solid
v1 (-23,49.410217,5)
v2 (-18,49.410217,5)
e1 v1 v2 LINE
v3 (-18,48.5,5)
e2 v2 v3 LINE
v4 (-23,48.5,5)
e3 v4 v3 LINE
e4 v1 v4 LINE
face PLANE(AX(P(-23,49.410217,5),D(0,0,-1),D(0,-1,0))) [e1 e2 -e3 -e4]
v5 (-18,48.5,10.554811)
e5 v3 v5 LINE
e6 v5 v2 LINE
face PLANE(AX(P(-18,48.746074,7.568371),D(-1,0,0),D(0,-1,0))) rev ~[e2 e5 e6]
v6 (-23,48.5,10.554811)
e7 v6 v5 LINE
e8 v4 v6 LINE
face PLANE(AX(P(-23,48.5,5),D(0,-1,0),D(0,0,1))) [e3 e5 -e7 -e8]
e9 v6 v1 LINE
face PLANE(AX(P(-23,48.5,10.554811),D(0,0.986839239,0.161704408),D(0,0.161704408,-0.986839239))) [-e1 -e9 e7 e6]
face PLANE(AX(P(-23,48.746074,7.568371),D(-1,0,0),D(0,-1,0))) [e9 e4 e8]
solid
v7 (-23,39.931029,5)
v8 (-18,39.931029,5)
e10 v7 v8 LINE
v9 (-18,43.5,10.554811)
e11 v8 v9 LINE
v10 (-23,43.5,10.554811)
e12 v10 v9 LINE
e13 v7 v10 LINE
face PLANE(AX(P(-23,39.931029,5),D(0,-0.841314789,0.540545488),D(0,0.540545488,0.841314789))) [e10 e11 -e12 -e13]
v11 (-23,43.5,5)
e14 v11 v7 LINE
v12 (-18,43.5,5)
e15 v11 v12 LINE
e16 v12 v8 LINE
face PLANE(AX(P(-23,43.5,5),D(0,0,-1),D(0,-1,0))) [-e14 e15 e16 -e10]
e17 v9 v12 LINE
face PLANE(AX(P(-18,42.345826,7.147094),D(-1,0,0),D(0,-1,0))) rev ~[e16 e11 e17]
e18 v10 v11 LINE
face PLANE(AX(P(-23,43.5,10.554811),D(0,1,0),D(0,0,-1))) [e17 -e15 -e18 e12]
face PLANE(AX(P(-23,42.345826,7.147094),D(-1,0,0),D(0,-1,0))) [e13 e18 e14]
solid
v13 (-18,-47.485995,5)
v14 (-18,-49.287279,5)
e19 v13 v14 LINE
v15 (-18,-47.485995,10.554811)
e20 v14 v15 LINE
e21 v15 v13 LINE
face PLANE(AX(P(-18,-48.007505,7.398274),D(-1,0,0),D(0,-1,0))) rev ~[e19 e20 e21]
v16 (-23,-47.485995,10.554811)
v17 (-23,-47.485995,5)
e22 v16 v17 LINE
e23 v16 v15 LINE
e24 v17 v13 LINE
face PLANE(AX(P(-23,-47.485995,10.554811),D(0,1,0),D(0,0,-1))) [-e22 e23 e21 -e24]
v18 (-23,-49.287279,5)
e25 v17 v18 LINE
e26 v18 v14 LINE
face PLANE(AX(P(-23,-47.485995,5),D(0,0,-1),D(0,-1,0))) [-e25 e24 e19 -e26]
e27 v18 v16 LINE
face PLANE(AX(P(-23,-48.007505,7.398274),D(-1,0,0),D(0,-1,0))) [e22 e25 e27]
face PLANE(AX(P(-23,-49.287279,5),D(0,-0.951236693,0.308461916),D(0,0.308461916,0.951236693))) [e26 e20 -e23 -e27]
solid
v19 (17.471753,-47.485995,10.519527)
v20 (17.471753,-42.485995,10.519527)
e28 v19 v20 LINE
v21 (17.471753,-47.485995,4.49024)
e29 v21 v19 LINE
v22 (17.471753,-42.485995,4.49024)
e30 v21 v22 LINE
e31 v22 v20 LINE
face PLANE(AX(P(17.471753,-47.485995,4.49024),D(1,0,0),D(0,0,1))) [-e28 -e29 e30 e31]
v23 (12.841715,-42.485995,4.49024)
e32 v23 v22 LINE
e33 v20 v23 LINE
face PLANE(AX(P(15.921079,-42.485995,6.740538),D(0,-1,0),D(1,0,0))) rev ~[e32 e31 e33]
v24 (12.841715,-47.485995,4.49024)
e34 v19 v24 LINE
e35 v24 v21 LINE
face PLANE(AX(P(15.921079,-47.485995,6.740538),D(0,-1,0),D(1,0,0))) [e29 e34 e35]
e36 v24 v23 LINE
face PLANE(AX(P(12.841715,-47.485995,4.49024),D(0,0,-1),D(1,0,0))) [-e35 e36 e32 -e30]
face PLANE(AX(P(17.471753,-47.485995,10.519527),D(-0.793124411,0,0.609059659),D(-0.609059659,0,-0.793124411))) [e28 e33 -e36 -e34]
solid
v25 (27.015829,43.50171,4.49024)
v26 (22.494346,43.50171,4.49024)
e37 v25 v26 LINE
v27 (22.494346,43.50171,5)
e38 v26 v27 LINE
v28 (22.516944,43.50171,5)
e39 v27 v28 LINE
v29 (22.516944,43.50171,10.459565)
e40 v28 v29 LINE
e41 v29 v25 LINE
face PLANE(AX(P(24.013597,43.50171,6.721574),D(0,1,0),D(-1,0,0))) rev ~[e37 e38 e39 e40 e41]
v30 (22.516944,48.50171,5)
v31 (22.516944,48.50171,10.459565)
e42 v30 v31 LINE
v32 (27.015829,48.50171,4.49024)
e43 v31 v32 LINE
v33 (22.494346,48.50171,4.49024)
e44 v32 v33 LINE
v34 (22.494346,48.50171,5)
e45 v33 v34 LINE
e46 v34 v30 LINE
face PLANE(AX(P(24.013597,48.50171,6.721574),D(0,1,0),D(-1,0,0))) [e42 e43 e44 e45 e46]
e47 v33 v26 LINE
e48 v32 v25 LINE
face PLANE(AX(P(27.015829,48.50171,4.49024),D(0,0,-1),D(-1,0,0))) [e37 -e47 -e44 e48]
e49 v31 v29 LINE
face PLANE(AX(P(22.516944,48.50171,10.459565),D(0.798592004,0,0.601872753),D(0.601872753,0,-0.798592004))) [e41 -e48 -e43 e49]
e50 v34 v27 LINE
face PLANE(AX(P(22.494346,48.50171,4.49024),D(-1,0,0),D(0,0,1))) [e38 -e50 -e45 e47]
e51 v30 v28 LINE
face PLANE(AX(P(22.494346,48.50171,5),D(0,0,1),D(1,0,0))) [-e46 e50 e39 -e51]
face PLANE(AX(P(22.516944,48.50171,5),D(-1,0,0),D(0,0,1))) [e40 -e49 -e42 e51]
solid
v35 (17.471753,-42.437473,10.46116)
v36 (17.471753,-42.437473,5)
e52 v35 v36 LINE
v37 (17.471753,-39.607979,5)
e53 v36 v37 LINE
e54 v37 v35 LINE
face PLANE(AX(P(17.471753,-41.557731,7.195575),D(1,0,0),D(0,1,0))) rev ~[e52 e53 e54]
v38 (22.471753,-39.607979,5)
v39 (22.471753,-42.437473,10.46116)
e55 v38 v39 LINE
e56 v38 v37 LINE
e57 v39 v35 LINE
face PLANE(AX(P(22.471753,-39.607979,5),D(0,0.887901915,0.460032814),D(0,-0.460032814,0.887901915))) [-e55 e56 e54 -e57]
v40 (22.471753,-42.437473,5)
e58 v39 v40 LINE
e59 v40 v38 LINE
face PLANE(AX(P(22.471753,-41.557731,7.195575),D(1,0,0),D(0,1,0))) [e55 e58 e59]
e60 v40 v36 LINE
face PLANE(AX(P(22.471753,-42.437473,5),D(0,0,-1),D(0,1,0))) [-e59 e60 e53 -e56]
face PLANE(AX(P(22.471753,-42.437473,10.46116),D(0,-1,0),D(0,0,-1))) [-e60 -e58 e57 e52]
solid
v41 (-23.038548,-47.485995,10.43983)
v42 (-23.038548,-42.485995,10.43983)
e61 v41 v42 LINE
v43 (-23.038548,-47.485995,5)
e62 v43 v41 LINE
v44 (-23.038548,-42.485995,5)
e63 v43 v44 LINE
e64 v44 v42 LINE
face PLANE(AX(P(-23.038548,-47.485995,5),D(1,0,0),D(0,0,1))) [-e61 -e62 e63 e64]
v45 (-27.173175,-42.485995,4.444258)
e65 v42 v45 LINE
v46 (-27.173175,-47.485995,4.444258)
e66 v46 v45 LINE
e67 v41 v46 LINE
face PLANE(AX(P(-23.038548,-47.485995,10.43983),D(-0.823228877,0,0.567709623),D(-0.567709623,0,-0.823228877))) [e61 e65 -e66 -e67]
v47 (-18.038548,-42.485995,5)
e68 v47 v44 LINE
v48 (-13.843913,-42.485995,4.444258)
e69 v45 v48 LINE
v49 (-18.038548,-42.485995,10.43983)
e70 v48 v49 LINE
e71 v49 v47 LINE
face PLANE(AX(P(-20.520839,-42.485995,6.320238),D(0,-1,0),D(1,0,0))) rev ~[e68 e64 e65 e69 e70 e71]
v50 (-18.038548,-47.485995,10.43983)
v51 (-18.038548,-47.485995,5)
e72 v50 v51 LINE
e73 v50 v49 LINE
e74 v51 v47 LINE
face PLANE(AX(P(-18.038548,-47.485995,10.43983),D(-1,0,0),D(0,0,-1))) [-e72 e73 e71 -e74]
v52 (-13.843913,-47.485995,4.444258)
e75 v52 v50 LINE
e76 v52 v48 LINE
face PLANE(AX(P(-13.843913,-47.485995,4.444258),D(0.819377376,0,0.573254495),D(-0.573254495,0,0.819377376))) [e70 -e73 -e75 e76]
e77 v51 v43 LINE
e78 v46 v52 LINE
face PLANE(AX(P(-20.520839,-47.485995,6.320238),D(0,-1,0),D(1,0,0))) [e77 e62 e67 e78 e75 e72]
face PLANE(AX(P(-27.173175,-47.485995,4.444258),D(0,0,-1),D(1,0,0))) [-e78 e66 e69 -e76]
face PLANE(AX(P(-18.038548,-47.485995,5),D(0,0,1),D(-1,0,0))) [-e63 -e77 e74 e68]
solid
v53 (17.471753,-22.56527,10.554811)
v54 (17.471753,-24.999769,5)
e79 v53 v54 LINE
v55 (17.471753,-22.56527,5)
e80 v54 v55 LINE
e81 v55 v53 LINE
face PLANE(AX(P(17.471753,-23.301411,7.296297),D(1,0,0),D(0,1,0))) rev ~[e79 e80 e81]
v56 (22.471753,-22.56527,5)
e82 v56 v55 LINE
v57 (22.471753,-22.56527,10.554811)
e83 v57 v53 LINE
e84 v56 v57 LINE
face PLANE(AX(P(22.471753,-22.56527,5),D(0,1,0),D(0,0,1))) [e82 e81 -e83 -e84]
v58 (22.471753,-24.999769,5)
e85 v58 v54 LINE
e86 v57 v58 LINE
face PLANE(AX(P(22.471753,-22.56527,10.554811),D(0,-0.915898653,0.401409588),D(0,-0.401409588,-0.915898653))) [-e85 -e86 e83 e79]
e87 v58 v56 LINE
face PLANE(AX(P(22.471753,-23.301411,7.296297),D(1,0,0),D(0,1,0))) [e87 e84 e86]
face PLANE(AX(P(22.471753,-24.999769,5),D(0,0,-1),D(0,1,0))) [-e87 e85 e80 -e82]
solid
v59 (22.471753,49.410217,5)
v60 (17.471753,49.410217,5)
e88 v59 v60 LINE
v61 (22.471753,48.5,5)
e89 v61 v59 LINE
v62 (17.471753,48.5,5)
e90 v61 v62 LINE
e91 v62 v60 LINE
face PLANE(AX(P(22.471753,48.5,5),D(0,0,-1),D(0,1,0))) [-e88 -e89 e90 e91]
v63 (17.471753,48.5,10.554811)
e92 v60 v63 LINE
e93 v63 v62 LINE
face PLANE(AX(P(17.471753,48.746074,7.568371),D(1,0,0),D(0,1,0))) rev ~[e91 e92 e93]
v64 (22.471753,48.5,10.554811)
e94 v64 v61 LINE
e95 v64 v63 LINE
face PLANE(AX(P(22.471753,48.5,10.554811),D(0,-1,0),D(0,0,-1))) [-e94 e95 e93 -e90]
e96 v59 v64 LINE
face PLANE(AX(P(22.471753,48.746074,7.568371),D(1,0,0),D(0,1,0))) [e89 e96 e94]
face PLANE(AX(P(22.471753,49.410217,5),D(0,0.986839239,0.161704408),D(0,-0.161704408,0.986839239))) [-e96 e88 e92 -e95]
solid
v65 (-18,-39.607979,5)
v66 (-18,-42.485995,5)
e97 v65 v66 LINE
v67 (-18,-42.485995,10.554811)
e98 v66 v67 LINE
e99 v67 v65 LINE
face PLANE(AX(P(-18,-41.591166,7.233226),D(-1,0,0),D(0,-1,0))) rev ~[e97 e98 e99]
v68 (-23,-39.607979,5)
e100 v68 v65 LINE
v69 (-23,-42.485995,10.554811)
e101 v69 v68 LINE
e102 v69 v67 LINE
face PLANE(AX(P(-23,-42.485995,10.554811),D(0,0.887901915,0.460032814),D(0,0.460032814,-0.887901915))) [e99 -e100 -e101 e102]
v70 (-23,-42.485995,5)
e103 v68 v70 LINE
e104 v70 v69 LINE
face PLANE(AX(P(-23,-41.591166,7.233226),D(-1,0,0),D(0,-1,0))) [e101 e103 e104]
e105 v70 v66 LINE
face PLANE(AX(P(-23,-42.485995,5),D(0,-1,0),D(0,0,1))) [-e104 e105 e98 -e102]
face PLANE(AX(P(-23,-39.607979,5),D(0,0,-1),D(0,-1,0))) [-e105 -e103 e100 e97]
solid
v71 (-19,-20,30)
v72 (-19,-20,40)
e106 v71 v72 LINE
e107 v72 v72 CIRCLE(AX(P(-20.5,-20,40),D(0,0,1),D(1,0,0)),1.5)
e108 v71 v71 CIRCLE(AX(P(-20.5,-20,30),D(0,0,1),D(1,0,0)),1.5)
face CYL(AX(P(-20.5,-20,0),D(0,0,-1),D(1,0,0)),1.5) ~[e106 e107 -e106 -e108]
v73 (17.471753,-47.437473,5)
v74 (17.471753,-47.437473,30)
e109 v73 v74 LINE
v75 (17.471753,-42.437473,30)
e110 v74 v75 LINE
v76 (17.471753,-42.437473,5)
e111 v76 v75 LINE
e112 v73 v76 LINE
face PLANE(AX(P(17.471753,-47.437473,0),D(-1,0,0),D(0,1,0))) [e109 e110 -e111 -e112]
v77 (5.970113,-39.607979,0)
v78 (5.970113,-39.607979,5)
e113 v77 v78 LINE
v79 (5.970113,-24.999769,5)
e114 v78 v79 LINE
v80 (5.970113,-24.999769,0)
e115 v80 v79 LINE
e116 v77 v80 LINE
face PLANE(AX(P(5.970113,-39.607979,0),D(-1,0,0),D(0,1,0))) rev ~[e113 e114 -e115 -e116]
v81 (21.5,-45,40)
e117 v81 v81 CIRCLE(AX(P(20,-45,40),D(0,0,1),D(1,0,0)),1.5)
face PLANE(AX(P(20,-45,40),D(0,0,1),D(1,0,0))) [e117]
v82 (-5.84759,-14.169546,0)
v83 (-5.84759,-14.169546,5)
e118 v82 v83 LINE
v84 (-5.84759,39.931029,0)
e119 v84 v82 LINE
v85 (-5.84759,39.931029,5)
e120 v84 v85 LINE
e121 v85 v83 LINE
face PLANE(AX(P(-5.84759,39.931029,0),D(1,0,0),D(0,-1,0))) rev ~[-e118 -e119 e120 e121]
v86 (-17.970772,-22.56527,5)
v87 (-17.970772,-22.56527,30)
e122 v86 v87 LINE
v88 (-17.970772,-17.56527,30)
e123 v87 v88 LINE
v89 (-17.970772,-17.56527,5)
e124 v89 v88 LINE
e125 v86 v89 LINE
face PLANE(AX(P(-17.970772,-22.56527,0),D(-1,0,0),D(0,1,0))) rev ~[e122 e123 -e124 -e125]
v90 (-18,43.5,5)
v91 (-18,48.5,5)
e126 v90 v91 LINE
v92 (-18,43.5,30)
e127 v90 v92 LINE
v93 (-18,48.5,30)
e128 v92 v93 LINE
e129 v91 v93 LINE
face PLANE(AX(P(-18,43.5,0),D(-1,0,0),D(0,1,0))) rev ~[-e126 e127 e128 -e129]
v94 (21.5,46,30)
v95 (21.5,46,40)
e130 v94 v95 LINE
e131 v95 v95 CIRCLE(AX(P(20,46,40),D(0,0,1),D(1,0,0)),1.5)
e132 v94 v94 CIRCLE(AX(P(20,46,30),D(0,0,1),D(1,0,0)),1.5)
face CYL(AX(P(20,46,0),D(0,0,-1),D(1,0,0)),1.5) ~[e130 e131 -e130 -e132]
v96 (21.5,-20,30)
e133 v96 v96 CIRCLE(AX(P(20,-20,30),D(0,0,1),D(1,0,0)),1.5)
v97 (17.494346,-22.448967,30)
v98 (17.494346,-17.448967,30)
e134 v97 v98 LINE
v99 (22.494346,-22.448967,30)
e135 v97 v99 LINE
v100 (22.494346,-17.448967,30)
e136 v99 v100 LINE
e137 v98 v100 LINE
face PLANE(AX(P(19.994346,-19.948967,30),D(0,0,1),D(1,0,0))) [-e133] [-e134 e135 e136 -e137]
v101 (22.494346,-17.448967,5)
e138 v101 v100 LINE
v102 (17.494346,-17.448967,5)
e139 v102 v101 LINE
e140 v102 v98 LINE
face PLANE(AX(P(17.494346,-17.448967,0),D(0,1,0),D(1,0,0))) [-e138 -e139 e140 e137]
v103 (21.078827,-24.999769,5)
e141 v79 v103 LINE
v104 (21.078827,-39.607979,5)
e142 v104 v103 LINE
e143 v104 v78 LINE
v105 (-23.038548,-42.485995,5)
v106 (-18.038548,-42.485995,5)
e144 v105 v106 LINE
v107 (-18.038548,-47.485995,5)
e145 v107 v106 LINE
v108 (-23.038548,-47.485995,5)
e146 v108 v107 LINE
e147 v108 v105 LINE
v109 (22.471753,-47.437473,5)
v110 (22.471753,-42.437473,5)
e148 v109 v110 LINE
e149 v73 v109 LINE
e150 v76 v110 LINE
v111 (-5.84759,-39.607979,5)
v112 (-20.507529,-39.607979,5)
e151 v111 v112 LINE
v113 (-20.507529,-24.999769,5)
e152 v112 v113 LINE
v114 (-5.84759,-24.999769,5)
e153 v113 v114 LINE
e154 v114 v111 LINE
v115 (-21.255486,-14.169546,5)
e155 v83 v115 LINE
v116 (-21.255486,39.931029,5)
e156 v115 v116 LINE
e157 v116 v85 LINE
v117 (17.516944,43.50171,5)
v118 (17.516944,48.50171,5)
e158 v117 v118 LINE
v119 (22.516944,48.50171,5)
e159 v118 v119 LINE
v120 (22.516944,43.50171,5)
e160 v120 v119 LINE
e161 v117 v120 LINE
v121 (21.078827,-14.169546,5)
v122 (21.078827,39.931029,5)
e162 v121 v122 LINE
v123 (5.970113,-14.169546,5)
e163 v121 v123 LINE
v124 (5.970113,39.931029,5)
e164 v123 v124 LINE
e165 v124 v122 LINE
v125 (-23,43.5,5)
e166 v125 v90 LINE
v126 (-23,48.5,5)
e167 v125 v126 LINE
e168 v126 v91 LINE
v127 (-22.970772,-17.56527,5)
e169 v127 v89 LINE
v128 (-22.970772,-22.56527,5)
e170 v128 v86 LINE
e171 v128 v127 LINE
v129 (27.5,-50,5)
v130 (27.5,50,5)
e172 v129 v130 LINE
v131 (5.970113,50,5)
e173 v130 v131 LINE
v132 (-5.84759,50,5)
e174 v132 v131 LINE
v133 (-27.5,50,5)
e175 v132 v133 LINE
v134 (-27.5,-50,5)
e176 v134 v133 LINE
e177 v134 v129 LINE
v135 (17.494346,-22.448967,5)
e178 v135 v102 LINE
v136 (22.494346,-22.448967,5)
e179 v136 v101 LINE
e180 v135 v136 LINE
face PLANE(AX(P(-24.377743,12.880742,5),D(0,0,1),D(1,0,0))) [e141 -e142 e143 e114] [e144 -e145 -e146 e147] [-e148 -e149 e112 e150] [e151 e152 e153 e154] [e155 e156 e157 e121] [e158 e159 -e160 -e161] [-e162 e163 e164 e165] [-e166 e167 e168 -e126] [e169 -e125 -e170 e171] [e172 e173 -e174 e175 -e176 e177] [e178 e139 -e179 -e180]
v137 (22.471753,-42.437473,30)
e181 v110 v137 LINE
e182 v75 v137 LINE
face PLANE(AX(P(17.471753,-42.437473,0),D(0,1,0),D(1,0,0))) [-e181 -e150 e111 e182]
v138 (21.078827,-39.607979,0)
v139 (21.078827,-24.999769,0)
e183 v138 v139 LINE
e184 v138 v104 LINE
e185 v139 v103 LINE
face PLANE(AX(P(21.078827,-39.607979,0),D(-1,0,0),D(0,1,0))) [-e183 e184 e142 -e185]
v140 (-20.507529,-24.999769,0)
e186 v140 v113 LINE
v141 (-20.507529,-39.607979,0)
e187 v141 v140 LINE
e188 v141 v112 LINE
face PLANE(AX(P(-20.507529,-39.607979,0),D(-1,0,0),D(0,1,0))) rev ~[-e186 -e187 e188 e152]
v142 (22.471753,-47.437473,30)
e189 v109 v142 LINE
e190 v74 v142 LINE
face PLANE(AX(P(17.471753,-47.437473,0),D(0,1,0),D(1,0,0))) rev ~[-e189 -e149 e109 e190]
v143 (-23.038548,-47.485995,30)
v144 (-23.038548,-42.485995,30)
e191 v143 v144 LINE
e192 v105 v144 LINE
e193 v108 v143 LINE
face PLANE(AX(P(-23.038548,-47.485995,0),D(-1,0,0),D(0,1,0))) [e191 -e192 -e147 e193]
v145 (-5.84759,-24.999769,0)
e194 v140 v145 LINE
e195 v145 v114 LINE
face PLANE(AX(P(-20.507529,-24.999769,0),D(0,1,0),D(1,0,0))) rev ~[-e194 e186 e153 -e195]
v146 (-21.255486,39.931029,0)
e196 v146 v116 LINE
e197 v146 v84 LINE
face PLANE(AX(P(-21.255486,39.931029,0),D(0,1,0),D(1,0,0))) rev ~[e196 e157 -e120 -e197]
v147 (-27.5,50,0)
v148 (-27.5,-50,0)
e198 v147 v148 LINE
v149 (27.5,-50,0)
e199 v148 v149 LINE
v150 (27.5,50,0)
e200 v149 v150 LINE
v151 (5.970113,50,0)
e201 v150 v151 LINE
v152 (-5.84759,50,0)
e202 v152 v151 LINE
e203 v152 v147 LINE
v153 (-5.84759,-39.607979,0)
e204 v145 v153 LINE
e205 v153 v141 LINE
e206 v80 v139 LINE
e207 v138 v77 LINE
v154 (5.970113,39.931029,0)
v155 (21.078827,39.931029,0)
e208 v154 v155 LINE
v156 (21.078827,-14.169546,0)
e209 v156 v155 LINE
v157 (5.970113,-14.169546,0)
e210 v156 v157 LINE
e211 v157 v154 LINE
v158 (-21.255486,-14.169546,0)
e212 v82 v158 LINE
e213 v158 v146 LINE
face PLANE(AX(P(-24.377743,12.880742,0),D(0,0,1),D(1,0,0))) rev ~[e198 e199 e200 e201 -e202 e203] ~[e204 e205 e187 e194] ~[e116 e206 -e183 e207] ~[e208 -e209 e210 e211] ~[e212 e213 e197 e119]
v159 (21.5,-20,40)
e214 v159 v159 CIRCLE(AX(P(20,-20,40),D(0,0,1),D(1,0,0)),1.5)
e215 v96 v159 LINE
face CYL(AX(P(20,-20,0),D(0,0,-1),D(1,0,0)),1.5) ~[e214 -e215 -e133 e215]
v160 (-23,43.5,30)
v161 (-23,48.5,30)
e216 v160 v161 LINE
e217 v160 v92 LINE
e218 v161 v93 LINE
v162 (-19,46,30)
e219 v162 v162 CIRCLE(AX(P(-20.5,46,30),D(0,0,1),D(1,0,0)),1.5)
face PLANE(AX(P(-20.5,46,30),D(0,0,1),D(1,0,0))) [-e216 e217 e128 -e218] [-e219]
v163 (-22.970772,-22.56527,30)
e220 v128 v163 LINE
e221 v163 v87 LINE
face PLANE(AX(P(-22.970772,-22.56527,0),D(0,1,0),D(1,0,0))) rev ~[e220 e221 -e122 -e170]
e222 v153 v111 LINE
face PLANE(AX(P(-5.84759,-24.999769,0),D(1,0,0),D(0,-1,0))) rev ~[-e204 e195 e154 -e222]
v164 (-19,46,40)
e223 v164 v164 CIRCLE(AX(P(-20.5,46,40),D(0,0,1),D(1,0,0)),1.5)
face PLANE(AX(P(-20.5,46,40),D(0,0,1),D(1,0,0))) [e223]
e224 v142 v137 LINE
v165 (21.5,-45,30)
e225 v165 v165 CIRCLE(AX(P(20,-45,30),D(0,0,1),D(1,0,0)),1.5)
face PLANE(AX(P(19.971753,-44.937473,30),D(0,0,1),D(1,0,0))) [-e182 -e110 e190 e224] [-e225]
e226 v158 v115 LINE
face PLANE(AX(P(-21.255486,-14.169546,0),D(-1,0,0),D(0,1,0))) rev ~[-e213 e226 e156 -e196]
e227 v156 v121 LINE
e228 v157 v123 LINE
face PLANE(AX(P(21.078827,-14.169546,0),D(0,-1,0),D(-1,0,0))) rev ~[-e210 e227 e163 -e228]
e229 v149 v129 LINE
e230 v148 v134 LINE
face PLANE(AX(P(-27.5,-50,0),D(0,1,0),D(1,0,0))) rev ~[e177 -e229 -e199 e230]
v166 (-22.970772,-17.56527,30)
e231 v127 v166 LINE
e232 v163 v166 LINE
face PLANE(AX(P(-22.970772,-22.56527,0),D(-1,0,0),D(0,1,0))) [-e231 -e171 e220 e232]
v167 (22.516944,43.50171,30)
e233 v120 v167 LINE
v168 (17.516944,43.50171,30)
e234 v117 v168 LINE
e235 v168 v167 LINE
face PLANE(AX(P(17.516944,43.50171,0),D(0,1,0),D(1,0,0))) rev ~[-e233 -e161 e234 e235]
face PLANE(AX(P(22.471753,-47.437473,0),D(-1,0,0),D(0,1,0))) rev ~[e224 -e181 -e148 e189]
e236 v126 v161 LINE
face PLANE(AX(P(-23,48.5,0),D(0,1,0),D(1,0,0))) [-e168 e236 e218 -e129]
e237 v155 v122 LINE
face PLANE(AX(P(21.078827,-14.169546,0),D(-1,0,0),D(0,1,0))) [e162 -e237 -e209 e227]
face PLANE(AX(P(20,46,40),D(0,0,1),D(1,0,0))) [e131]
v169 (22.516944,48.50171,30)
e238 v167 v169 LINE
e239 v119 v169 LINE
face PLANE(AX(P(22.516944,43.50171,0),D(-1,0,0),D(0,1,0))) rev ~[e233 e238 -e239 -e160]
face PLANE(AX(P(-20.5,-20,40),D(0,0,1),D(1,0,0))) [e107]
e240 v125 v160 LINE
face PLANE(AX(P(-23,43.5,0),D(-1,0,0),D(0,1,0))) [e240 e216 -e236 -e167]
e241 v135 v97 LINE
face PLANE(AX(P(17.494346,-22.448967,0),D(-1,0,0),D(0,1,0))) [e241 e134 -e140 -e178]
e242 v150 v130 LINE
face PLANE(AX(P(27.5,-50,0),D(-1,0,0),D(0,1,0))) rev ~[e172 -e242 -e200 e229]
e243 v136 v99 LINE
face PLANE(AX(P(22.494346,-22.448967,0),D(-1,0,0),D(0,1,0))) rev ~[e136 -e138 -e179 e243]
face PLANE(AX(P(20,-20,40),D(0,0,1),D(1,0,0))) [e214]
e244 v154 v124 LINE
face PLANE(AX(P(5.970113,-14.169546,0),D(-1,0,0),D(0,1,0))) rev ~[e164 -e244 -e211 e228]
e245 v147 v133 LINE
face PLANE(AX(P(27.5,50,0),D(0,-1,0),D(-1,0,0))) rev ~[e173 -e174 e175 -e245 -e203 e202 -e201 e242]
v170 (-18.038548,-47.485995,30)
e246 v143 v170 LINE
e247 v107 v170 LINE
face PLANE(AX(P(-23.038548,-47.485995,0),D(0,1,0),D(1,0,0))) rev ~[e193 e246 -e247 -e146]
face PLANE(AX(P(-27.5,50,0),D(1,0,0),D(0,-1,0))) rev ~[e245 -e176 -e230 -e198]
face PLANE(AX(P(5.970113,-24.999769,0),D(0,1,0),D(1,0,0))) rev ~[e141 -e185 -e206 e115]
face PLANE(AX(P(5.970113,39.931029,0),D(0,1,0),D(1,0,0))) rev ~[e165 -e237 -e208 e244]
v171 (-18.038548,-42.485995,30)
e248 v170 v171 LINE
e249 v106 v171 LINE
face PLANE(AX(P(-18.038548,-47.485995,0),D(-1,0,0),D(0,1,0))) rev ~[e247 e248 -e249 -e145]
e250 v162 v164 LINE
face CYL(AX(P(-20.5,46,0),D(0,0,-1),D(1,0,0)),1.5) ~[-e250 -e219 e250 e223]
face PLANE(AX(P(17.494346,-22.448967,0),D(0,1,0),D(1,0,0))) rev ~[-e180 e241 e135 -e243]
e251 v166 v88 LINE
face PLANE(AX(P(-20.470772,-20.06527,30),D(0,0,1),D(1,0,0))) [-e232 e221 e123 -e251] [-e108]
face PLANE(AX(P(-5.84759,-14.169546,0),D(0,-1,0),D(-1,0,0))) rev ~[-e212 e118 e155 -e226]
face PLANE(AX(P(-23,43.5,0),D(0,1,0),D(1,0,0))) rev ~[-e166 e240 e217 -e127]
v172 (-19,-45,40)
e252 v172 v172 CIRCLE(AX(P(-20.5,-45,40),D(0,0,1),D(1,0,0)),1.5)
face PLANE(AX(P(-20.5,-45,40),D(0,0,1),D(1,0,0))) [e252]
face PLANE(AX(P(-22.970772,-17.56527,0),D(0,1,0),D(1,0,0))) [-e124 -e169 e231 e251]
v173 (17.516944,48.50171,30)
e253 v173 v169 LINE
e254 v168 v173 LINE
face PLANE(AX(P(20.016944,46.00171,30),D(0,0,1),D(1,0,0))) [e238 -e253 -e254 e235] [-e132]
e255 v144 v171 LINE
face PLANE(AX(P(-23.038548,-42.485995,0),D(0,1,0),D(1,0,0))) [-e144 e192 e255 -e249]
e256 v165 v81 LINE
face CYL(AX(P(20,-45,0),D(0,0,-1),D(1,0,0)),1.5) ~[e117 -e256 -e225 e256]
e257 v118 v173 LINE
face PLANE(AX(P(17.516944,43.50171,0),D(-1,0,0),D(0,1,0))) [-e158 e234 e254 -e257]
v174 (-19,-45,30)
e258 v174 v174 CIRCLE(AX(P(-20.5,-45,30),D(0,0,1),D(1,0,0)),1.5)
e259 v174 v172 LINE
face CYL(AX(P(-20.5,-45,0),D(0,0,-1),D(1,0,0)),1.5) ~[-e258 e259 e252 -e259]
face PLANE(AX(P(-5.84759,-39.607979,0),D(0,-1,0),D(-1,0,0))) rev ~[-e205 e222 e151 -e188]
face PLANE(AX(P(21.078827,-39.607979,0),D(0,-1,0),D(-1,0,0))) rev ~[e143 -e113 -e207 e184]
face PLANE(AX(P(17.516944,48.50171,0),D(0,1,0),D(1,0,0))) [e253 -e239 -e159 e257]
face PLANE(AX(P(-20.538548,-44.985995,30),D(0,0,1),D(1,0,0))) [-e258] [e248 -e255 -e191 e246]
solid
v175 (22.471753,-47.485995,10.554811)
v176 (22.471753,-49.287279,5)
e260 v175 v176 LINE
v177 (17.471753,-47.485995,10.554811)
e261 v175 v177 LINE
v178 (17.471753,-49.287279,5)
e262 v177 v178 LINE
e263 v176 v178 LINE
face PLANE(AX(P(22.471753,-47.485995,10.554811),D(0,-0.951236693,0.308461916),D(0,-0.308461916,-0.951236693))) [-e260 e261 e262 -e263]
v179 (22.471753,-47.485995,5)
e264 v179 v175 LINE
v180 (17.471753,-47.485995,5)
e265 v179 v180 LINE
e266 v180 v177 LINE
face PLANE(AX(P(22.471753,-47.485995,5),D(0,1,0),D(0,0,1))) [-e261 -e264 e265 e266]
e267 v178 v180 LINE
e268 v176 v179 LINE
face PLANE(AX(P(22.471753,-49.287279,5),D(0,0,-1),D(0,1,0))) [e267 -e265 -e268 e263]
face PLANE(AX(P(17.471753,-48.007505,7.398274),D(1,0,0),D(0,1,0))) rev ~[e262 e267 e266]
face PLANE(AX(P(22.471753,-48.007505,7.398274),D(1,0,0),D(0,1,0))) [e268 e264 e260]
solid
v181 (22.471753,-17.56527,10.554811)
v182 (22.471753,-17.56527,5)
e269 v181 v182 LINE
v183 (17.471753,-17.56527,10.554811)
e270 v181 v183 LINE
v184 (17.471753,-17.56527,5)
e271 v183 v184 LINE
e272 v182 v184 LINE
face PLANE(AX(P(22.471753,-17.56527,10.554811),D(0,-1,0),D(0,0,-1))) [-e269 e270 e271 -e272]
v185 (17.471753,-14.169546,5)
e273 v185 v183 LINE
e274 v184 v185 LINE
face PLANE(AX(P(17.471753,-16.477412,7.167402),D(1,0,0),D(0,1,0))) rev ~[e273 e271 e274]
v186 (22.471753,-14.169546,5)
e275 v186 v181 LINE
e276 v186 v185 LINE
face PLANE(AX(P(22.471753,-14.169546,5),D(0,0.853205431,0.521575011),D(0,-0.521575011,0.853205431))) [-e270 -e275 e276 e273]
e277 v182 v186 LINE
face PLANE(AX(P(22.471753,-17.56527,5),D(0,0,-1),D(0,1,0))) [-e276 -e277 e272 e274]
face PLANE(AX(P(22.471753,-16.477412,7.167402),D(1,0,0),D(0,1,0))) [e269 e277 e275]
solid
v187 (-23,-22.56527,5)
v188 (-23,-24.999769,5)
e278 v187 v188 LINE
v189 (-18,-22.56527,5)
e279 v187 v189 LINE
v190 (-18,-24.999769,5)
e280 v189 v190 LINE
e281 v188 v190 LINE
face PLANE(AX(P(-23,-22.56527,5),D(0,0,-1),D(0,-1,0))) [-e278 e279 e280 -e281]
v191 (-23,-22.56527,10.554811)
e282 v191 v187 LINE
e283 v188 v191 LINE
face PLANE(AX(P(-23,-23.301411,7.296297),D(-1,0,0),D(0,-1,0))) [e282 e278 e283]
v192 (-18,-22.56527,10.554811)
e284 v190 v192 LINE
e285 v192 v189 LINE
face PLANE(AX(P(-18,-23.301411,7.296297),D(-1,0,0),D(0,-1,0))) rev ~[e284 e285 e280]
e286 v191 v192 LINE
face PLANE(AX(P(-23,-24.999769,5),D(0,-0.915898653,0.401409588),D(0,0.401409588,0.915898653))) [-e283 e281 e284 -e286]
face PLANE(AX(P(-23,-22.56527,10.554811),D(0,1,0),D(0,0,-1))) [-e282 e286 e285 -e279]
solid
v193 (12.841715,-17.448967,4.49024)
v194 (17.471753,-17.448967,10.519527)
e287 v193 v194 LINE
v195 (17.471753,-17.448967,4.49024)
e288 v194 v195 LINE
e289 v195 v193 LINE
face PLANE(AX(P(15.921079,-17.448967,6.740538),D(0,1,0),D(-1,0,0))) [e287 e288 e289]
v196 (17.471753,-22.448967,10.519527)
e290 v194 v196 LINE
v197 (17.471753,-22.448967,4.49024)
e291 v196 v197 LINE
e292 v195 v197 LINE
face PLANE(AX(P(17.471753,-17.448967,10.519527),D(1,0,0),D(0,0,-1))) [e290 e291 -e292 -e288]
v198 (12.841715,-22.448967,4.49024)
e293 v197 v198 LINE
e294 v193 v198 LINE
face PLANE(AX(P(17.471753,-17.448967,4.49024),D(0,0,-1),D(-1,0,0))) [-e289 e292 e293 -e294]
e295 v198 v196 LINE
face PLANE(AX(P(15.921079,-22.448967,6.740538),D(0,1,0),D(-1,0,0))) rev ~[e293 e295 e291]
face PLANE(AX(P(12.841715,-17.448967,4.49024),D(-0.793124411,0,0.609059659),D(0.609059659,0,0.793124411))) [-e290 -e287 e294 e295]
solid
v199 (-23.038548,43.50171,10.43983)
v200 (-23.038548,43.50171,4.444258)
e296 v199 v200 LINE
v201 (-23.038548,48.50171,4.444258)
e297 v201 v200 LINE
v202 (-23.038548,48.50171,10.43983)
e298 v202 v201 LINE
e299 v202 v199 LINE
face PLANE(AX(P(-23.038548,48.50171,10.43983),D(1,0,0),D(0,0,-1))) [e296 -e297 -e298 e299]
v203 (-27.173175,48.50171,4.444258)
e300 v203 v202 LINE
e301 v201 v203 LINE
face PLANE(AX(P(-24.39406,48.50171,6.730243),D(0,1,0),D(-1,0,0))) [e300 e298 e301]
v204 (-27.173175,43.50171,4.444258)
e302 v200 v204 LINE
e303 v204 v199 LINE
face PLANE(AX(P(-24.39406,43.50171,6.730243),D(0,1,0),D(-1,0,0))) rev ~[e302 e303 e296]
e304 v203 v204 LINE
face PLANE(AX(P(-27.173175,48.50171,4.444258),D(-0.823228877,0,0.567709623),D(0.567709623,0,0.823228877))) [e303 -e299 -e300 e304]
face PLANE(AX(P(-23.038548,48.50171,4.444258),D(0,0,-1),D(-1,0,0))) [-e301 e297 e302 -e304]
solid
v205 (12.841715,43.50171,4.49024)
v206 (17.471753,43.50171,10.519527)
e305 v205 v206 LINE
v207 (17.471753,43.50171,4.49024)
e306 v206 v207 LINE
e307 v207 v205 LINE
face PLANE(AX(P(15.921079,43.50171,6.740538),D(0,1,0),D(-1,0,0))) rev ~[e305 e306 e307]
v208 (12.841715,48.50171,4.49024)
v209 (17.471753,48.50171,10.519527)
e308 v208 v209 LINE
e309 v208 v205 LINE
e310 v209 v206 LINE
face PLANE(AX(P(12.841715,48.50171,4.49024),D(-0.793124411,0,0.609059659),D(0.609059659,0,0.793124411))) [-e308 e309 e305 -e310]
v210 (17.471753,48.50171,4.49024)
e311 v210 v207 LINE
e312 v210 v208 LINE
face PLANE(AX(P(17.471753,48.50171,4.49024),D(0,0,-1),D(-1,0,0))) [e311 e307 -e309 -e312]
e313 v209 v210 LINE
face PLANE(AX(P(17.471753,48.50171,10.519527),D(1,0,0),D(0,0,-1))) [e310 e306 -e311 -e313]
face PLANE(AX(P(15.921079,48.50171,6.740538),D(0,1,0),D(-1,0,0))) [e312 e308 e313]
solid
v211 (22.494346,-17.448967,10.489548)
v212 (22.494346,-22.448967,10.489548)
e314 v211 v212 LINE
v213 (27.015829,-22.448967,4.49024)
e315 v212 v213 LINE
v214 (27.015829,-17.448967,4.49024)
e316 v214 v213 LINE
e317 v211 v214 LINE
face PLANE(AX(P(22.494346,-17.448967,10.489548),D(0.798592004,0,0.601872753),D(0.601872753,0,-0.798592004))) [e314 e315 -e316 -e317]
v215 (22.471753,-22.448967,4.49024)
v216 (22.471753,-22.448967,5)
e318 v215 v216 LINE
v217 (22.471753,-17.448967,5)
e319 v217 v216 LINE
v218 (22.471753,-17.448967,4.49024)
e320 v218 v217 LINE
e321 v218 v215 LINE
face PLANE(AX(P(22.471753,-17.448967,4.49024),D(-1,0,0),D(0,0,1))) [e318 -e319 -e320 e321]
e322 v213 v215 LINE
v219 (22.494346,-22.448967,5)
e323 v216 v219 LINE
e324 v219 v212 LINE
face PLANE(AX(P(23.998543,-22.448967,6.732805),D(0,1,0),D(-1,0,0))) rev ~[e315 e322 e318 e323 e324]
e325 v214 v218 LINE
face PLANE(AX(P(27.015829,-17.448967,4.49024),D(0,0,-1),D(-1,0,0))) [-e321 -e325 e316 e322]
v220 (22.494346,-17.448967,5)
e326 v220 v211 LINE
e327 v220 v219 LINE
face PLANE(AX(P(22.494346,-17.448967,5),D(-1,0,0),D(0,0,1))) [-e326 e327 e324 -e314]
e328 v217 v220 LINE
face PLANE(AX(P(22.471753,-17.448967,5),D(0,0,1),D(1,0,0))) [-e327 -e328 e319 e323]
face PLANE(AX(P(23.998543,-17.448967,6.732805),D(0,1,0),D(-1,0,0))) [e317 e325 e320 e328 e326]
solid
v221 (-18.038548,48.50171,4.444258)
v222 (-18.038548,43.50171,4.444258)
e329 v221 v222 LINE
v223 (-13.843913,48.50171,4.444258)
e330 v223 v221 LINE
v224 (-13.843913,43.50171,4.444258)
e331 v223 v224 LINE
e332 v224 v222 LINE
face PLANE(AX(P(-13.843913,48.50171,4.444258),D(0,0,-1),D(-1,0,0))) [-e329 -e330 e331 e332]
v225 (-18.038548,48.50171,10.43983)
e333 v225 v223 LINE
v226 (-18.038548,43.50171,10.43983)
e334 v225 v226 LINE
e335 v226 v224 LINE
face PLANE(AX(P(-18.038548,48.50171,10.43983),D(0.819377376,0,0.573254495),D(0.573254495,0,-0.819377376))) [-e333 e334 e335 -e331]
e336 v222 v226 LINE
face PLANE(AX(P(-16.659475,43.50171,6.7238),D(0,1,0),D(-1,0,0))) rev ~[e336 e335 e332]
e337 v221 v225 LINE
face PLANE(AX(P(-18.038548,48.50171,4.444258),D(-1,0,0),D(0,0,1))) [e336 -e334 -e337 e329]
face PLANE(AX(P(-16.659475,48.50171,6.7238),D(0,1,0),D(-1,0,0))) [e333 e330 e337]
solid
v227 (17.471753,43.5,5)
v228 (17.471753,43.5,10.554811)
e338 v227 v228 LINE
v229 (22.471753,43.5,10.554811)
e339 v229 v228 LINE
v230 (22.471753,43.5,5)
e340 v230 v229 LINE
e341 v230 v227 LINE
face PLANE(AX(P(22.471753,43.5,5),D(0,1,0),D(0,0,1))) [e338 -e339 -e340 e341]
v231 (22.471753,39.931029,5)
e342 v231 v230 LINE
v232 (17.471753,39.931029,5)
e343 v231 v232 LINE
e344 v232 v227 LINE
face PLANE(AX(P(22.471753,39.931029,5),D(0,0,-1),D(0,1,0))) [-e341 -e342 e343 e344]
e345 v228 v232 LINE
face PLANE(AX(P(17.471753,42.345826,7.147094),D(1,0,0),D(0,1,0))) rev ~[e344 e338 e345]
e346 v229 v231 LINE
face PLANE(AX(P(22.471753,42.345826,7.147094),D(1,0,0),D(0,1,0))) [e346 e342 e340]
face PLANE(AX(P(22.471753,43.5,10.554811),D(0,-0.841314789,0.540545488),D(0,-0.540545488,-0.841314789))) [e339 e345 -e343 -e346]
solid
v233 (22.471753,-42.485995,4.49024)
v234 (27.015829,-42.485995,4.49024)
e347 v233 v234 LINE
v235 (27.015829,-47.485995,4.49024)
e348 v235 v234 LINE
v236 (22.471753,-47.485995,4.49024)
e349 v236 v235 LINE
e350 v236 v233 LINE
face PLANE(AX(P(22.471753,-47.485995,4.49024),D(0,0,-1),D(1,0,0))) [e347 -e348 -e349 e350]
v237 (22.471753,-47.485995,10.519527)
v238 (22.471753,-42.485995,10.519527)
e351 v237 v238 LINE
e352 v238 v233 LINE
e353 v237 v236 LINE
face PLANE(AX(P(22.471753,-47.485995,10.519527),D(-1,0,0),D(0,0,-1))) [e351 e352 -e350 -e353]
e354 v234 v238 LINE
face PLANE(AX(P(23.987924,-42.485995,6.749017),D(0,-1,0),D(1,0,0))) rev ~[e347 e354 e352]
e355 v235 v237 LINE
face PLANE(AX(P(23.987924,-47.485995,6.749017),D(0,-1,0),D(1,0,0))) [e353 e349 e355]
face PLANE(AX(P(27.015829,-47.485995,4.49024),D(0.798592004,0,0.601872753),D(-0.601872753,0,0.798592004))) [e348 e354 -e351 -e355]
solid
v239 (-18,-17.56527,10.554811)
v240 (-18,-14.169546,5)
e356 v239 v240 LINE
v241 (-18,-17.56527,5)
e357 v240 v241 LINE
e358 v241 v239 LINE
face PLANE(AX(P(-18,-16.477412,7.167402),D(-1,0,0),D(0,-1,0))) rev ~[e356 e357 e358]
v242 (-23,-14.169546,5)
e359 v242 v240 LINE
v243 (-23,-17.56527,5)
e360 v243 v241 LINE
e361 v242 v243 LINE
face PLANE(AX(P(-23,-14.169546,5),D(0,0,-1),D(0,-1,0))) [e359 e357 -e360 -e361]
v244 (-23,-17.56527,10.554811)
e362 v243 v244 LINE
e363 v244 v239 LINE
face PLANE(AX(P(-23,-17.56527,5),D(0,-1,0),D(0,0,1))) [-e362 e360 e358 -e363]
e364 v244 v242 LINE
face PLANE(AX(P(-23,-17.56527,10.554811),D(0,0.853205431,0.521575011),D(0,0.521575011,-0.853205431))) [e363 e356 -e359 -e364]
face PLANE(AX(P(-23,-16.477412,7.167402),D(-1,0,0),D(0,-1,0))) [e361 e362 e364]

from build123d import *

# Parameters (mm, degrees)
F0_W      = 6.2445142865
F0_H      = 54.1005749255
F0_W_2    = 5
F0_H_2    = 5
F0_W_3    = 11.8177030236
F0_H_3    = 10.0689709187
F0_W_4    = 6.4211731404
F0_H_4    = 10.8302235603
F0_H_5    = 14.6082099527
F0_H_6    = 10.3920206428
F0_W_5    = 6.9924706221
F1_DEPTH  = 5
F0_R      = 1.5
F2_DEPTH  = 30
F3_DEPTH  = 40
F5_DEPTH  = 5
F7_DEPTH  = 5
F9_DEPTH  = 5
F11_DEPTH = 5
F13_DEPTH = 5


# Not quite as in the source:
# - a feature names something its author has since deleted; it is built from what else it names


with BuildPart() as f1:
    # F0 (on Top) → F1 (new body)
    with BuildSketch(Plane.XY):
        with Locations((-24.3777428567, 12.8807416186)):
            Rectangle(F0_W, F0_H)
        Polygon((-21.2554857135, 39.9310290813), (-5.8475900441, 39.9310290813), (-5.8475900441, 50), (-27.5, 50), (-27.5, 39.9310290813), align=None)
        with Locations((-20.5, 46)):
            Rectangle(F0_W_2, F0_H_2, mode=Mode.SUBTRACT)
        with Locations((0.0612614676, 44.9655145407)):
            Rectangle(F0_W_3, F0_H_3)
        Polygon((21.0788268596, 39.9310290813), (27.5, 39.9310290813), (27.5, 50), (5.9701129794, 50), (5.9701129794, 39.9310290813), align=None)
        with Locations((20.0169440359, 46.0017099977)):
            Rectangle(F0_W_2, F0_H_2, mode=Mode.SUBTRACT)
        with Locations((24.2894134298, 12.8807416186)):
            Rectangle(F0_W_4, F0_H)
        with Locations((0.0612614676, 12.8807416186)):
            Rectangle(F0_W_3, F0_H)
        with Locations((0.0612614676, -19.5846576244)):
            Rectangle(F0_W_3, F0_H_4)
        with Locations((0.0612614676, -32.3038743809)):
            Rectangle(F0_W_3, F0_H_5)
        with Locations((0.0612614676, -44.8039896786)):
            Rectangle(F0_W_3, F0_H_6)
        Polygon((5.9701129794, -50), (27.5, -50), (27.5, -39.6079793572), (21.0788268596, -39.6079793572), (5.9701129794, -39.6079793572), align=None)
        with Locations((19.9717525393, -44.9374727905)):
            Rectangle(F0_W_2, F0_H_2, mode=Mode.SUBTRACT)
        Polygon((-27.5, -50), (-5.8475900441, -50), (-5.8475900441, -39.6079793572), (-20.5075293779, -39.6079793572), (-27.5, -39.6079793572), align=None)
        with Locations((-20.5385480076, -44.9859946966)):
            Rectangle(F0_W_2, F0_H_2, mode=Mode.SUBTRACT)
        with Locations((-24.003764689, -32.3038743809)):
            Rectangle(F0_W_5, F0_H_5)
        with Locations((24.2894134298, -32.3038743809)):
            Rectangle(F0_W_4, F0_H_5)
        Polygon((21.0788268596, -24.9997694045), (27.5, -24.9997694045), (27.5, -14.1695458442), (21.0788268596, -14.1695458442), (5.9701129794, -14.1695458442), (5.9701129794, -24.9997694045), align=None)
        with Locations((19.9943464249, -19.9489668012)):
            Rectangle(F0_W_2, F0_H_2, mode=Mode.SUBTRACT)
        Polygon((-20.5075293779, -24.9997694045), (-5.8475900441, -24.9997694045), (-5.8475900441, -14.1695458442), (-21.2554857135, -14.1695458442), (-27.5, -14.1695458442), (-27.5, -24.9997694045), align=None)
        with Locations((-20.4707719386, -20.0652703643)):
            Rectangle(F0_W_2, F0_H_2, mode=Mode.SUBTRACT)
    extrude(amount=F1_DEPTH)

    # F0 (on Top) → F2 (join)
    with BuildSketch(Plane.XY):
        with Locations((-20.5, 46)):
            Rectangle(F0_W_2, F0_H_2)
        with Locations((-20.5, 46)):
            Circle(F0_R, mode=Mode.SUBTRACT)
        with Locations((20.0169440359, 46.0017099977)):
            Rectangle(F0_W_2, F0_H_2)
        with Locations((20, 46)):
            Circle(F0_R, mode=Mode.SUBTRACT)
        with Locations((-20.4707719386, -20.0652703643)):
            Rectangle(F0_W_2, F0_H_2)
        with Locations((-20.5, -20)):
            Circle(F0_R, mode=Mode.SUBTRACT)
        with Locations((19.9943464249, -19.9489668012)):
            Rectangle(F0_W_2, F0_H_2)
        with Locations((20, -20)):
            Circle(F0_R, mode=Mode.SUBTRACT)
        with Locations((19.9717525393, -44.9374727905)):
            Rectangle(F0_W_2, F0_H_2)
        with Locations((20, -45)):
            Circle(F0_R, mode=Mode.SUBTRACT)
        with Locations((-20.5385480076, -44.9859946966)):
            Rectangle(F0_W_2, F0_H_2)
        with Locations((-20.5, -45)):
            Circle(F0_R, mode=Mode.SUBTRACT)
    extrude(amount=F2_DEPTH)

    # F0 (on Top) → F3 (join)
    with BuildSketch(Plane.XY):
        with Locations((-20.5, 46)):
            Circle(F0_R)
        with Locations((20, 46)):
            Circle(F0_R)
        with Locations((20, -20)):
            Circle(F0_R)
        with Locations((-20.5, -20)):
            Circle(F0_R)
        with Locations((-20.5, -45)):
            Circle(F0_R)
        with Locations((20, -45)):
            Circle(F0_R)
    extrude(amount=F3_DEPTH)


with BuildPart() as f5:
    # F4 (on face) → F5 (new body)
    with BuildSketch(Plane.XZ.offset(47.4859946966)):
        Polygon((-23.0385480076, 5), (-23.0385480076, 10.4398299009), (-27.1731745452, 4.4442578219), (-23.0385480076, 4.4442578219), (-18.0385480076, 4.4442578219), (-13.8439134623, 4.4442578219), (-18.0385480076, 10.4398299009), (-18.0385480076, 5), align=None)
    extrude(amount=-F5_DEPTH)


with BuildPart() as f5b:
    # F4 (on face) → F5, piece 2 (new body)
    with BuildSketch(Plane.XZ.offset(47.4859946966)):
        Polygon((12.8417154774, 4.4902400114), (17.4717525393, 4.4902400114), (17.4717525393, 10.5195268989), align=None)
    extrude(amount=-F5_DEPTH)


with BuildPart() as f5c:
    # F4 (on face) → F5, piece 3 (new body)
    with BuildSketch(Plane.XZ.offset(47.4859946966)):
        Polygon((22.4717525393, 10.5195268989), (22.4717525393, 4.4902400114), (27.0158294588, 4.4902400114), align=None)
    extrude(amount=-F5_DEPTH)


with BuildPart() as f7:
    # F6 (on face) → F7 (new body)
    with BuildSketch(Plane(origin=(-23, 0, 0), x_dir=(0, -1, 0), z_dir=(-1, 0, 0))):
        Polygon((49.2872789123, 5), (47.4859946966, 10.5548109859), (47.4859946966, 5), align=None)
    extrude(amount=-F7_DEPTH)


with BuildPart() as f7b:
    # F6 (on face) → F7, piece 2 (new body)
    with BuildSketch(Plane(origin=(-23, 0, 0), x_dir=(0, -1, 0), z_dir=(-1, 0, 0))):
        Polygon((42.4859946966, 5), (42.4859946966, 10.5548109859), (39.6079793572, 5), align=None)
    extrude(amount=-F7_DEPTH)


with BuildPart() as f7c:
    # F6 (on face) → F7, piece 3 (new body)
    with BuildSketch(Plane(origin=(-23, 0, 0), x_dir=(0, -1, 0), z_dir=(-1, 0, 0))):
        Polygon((22.5652703643, 10.5548109859), (22.5652703643, 5), (24.9997694045, 5), align=None)
    extrude(amount=-F7_DEPTH)


with BuildPart() as f7d:
    # F6 (on face) → F7, piece 4 (new body)
    with BuildSketch(Plane(origin=(-23, 0, 0), x_dir=(0, -1, 0), z_dir=(-1, 0, 0))):
        Polygon((14.1695458442, 5), (17.5652703643, 5), (17.5652703643, 10.5548109859), align=None)
    extrude(amount=-F7_DEPTH)


with BuildPart() as f7e:
    # F6 (on face) → F7, piece 5 (new body)
    with BuildSketch(Plane(origin=(-23, 0, 0), x_dir=(0, -1, 0), z_dir=(-1, 0, 0))):
        Polygon((-39.9310290813, 5), (-43.5, 10.5548109859), (-43.5, 5), align=None)
    extrude(amount=-F7_DEPTH)


with BuildPart() as f7f:
    # F6 (on face) → F7, piece 6 (new body)
    with BuildSketch(Plane(origin=(-23, 0, 0), x_dir=(0, -1, 0), z_dir=(-1, 0, 0))):
        Polygon((-48.5, 5), (-48.5, 10.5548109859), (-49.4102165648, 5), align=None)
    extrude(amount=-F7_DEPTH)


with BuildPart() as f9:
    # F8 (on face) → F9 (new body)
    with BuildSketch(Plane.YZ.offset(22.4717525393)):
        Polygon((-49.2872789123, 5), (-47.4859946966, 5), (-47.4859946966, 10.5548109859), align=None)
    extrude(amount=-F9_DEPTH)


with BuildPart() as f9b:
    # F8 (on face) → F9, piece 2 (new body)
    with BuildSketch(Plane.YZ.offset(22.4717525393)):
        Polygon((-39.6079793572, 5), (-42.4374727905, 10.4611596375), (-42.4374727905, 5), align=None)
    extrude(amount=-F9_DEPTH)


with BuildPart() as f9c:
    # F8 (on face) → F9, piece 3 (new body)
    with BuildSketch(Plane.YZ.offset(22.4717525393)):
        Polygon((-22.5652703643, 10.5548109859), (-24.9997694045, 5), (-22.5652703643, 5), align=None)
    extrude(amount=-F9_DEPTH)


with BuildPart() as f9d:
    # F8 (on face) → F9, piece 4 (new body)
    with BuildSketch(Plane.YZ.offset(22.4717525393)):
        Polygon((-14.1695458442, 5), (-17.5652703643, 10.5548109859), (-17.5652703643, 5), align=None)
    extrude(amount=-F9_DEPTH)


with BuildPart() as f9e:
    # F8 (on face) → F9, piece 5 (new body)
    with BuildSketch(Plane.YZ.offset(22.4717525393)):
        Polygon((43.5, 10.5548109859), (39.9310290813, 5), (43.5, 5), align=None)
    extrude(amount=-F9_DEPTH)


with BuildPart() as f9f:
    # F8 (on face) → F9, piece 6 (new body)
    with BuildSketch(Plane.YZ.offset(22.4717525393)):
        Polygon((48.5, 5), (49.4102165648, 5), (48.5, 10.5548109859), align=None)
    extrude(amount=-F9_DEPTH)


with BuildPart() as f11:
    # F10 (on face) → F11 (new body)
    with BuildSketch(Plane(origin=(0, -17.4489668012, 0), x_dir=(-1, 0, 0), z_dir=(0, 1, 0))):
        Polygon((-22.4943464249, 5), (-22.4943464249, 10.4895483089), (-27.0158294588, 4.4902400114), (-22.4717525393, 4.4902400114), (-22.4717525393, 5), align=None)
    extrude(amount=-F11_DEPTH)


with BuildPart() as f11b:
    # F10 (on face) → F11, piece 2 (new body)
    with BuildSketch(Plane(origin=(0, -17.4489668012, 0), x_dir=(-1, 0, 0), z_dir=(0, 1, 0))):
        Polygon((-17.4717525393, 4.4902400114), (-12.8417154774, 4.4902400114), (-17.4717525393, 10.5195268989), align=None)
    extrude(amount=-F11_DEPTH)


with BuildPart() as f13:
    # F12 (on face) → F13 (new body)
    with BuildSketch(Plane(origin=(0, 48.5017099977, 0), x_dir=(-1, 0, 0), z_dir=(0, 1, 0))):
        Polygon((-22.5169440359, 5), (-22.5169440359, 10.4595647761), (-27.0158294588, 4.4902400114), (-22.4943464249, 4.4902400114), (-22.4943464249, 5), align=None)
    extrude(amount=-F13_DEPTH)


with BuildPart() as f13b:
    # F12 (on face) → F13, piece 2 (new body)
    with BuildSketch(Plane(origin=(0, 48.5017099977, 0), x_dir=(-1, 0, 0), z_dir=(0, 1, 0))):
        Polygon((-12.8417154774, 4.4902400114), (-17.4717525393, 10.5195268989), (-17.4717525393, 4.4902400114), align=None)
    extrude(amount=-F13_DEPTH)


with BuildPart() as f13c:
    # F12 (on face) → F13, piece 3 (new body)
    with BuildSketch(Plane(origin=(0, 48.5017099977, 0), x_dir=(-1, 0, 0), z_dir=(0, 1, 0))):
        Polygon((13.8439134623, 4.4442578219), (18.0385480076, 4.4442578219), (18.0385480076, 10.4398299009), align=None)
    extrude(amount=-F13_DEPTH)


with BuildPart() as f13d:
    # F12 (on face) → F13, piece 4 (new body)
    with BuildSketch(Plane(origin=(0, 48.5017099977, 0), x_dir=(-1, 0, 0), z_dir=(0, 1, 0))):
        Polygon((27.1731745452, 4.4442578219), (23.0385480076, 10.4398299009), (23.0385480076, 4.4442578219), align=None)
    extrude(amount=-F13_DEPTH)


solid = Compound([f1.part, f5.part, f5b.part, f5c.part, f7.part, f7b.part, f7c.part, f7d.part, f7e.part, f7f.part, f9.part, f9b.part, f9c.part, f9d.part, f9e.part, f9f.part, f11.part, f11b.part, f13.part, f13b.part, f13c.part, f13d.part])
